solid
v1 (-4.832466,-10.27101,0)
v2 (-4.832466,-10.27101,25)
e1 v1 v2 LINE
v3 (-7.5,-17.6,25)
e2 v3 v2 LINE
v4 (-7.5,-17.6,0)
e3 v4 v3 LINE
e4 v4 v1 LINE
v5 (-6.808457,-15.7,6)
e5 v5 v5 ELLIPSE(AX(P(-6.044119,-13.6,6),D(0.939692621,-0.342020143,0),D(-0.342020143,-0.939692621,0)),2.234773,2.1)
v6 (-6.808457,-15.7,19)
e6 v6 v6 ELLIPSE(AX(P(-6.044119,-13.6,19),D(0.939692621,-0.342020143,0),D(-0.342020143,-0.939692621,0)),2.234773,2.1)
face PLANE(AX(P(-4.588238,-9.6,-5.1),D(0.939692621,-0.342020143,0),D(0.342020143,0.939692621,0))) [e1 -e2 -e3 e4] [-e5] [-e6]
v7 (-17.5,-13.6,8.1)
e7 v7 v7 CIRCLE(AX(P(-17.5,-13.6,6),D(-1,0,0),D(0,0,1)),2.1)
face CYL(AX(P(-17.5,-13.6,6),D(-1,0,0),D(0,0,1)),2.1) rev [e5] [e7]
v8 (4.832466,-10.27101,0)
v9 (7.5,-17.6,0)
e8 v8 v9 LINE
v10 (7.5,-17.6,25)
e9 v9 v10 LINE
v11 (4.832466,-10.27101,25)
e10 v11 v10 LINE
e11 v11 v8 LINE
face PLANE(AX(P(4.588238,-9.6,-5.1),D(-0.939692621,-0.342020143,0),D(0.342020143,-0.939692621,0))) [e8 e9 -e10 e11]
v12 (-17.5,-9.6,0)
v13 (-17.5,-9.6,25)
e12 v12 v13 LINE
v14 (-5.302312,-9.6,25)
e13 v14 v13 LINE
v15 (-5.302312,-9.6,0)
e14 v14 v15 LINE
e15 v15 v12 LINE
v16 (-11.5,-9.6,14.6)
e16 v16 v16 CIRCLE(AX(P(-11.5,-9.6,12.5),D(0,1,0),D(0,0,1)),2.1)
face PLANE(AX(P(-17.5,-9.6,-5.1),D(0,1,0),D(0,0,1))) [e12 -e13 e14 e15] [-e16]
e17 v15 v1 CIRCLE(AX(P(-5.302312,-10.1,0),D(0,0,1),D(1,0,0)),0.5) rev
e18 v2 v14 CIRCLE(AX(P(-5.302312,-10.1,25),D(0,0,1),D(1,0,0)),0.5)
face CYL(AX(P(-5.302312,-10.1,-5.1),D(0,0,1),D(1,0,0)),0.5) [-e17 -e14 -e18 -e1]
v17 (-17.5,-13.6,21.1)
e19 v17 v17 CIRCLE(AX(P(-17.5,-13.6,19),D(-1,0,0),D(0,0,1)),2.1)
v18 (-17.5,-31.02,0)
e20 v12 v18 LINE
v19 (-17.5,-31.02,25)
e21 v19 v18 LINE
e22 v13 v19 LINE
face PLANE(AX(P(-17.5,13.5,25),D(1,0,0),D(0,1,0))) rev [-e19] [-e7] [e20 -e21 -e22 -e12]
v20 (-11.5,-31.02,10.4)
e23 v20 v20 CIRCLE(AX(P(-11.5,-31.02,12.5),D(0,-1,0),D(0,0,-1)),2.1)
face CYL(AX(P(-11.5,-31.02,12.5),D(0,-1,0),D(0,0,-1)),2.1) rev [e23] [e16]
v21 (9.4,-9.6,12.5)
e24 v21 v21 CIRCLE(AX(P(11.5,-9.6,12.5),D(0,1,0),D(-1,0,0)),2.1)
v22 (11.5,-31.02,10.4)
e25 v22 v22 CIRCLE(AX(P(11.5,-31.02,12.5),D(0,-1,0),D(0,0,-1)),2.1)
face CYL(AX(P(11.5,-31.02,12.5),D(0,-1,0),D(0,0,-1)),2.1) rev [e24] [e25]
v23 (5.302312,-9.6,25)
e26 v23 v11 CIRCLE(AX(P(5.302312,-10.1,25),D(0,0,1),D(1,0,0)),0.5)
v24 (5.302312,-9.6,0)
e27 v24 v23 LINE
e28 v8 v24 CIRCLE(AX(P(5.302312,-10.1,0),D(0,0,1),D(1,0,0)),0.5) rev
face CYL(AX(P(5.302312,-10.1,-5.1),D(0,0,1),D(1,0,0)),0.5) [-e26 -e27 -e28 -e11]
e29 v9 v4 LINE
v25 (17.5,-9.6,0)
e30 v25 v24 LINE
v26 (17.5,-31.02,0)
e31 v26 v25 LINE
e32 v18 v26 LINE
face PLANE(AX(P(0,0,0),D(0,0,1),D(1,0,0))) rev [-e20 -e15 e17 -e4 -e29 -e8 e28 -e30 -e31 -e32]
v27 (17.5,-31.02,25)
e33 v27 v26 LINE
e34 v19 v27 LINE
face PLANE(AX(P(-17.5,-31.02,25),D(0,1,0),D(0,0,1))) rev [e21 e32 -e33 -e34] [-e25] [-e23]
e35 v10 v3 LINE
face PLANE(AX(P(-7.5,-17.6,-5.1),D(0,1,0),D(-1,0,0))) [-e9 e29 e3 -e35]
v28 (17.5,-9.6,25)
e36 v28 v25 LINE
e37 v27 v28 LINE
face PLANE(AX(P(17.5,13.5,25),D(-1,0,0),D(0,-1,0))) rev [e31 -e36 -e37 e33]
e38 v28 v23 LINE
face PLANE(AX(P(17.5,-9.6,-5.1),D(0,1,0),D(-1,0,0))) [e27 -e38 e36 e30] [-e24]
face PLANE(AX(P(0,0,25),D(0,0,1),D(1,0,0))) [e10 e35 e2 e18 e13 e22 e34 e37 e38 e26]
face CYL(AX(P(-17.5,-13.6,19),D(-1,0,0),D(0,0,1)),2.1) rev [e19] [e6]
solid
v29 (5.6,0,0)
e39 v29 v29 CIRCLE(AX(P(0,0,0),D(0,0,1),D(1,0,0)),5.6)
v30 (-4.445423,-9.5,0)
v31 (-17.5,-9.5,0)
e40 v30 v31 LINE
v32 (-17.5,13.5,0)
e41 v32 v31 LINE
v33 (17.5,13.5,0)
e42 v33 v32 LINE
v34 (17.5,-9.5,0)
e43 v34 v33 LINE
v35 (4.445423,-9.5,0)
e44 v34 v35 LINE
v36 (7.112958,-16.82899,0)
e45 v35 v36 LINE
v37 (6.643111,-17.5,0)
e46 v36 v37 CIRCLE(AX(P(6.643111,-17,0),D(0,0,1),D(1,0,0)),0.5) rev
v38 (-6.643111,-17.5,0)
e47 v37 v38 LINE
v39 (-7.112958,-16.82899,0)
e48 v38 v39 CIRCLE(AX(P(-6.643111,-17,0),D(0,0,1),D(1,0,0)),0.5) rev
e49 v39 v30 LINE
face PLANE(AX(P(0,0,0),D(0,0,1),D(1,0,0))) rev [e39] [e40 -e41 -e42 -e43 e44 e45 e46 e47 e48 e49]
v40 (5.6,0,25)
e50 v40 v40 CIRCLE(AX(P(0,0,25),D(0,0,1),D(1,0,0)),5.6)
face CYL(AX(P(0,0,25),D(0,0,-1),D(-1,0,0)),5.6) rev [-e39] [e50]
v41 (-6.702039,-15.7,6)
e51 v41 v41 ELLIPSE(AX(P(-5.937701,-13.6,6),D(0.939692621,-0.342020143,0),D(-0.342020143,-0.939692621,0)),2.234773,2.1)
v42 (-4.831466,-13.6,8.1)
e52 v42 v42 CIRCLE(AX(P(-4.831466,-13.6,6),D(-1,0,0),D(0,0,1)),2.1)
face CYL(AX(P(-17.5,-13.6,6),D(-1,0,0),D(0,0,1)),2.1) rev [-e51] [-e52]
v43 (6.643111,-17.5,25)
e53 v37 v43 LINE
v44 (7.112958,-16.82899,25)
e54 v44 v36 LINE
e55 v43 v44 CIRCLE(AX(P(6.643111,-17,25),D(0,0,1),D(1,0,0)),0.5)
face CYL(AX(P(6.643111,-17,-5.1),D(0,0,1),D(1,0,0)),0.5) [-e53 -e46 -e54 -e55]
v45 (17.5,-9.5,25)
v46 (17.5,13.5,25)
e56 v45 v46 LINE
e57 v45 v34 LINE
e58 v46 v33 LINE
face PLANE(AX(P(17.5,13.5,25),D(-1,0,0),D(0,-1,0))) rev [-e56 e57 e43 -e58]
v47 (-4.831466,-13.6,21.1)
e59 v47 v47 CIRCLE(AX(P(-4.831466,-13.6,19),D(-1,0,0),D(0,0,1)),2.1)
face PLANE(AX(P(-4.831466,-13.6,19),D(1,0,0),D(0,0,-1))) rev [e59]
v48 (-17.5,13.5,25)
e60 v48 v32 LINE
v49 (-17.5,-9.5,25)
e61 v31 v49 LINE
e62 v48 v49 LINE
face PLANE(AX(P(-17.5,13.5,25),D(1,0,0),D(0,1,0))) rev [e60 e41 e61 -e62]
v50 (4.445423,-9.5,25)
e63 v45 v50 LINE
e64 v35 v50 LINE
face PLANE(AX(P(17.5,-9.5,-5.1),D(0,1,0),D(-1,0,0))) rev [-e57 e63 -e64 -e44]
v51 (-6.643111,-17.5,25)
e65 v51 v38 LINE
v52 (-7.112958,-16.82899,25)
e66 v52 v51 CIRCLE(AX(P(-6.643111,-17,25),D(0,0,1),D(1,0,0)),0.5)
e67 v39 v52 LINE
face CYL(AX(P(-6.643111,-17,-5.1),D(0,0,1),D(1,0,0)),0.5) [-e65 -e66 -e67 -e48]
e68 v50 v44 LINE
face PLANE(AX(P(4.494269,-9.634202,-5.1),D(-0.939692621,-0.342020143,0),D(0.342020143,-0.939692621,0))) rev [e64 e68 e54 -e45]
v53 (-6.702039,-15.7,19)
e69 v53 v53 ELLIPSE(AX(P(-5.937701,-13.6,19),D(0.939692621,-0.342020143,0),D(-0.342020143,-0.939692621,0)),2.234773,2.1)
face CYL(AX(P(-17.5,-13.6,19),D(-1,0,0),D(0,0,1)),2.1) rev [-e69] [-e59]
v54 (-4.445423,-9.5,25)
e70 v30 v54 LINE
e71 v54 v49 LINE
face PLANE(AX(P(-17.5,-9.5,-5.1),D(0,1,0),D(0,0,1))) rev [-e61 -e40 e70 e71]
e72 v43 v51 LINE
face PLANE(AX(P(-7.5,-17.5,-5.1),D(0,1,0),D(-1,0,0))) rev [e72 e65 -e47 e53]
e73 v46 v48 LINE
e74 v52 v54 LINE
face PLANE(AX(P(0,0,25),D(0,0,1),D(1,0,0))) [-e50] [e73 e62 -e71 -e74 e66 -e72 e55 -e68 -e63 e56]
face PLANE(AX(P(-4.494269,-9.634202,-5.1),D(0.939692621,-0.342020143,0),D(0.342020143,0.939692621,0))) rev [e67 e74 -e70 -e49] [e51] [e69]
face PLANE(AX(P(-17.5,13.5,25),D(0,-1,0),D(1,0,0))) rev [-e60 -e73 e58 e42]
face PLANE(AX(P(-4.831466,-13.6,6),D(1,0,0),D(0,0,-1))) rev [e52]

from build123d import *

# Parameters (mm, degrees)
SKETCH1_W                      = 35
SKETCH1_H                      = 44.52
SKETCH1_R                      = 5.6
BOSS_EXTRUDE1_DEPTH            = 25
CUT_EXTRUDE_THIN3_DEPTH        = 30.1
FILLET1_R                      = 0.5
FILLET2_R                      = 0.5
FILLET3_R                      = 0.5
FILLET4_R                      = 0.5
SKETCH6_W                      = 2.1
SKETCH6_H                      = 44.52
M5X0_8_TAPPED_HOLE1_AT_2_COUNT = 2
M5X0_8_TAPPED_HOLE1_AT_2_PITCH = 23
M5X0_8_START                   = -17.5
M5X0_8_TAPPED_HOLE2_OUTLINE_R  = 2.1
M5X0_8_TAPPED_HOLE2_DEPTH      = 12.668534181


# Read off the part's stored shape, not the designer's step: M5x0.8 Tapped Hole2
with BuildPart() as part:
    # Sketch1 → Boss-Extrude1 (new body)
    with BuildSketch(Plane.XY):
        with Locations((0, -8.76)):
            Rectangle(SKETCH1_W, SKETCH1_H)
        Circle(SKETCH1_R, mode=Mode.SUBTRACT)
    extrude(amount=BOSS_EXTRUDE1_DEPTH)

    # Sketch7 → Cut-Extrude-Thin3 (cut)
    with BuildSketch(Plane.XY.offset(25)):
        Polygon((-17.5, -9.6), (-4.588238126, -9.6), (-7.5, -17.6), (7.5, -17.6), (4.588238126, -9.6), (17.5, -9.6), (17.5, -9.5), (4.445423325, -9.5), (7.357185199, -17.5), (-7.357185199, -17.5), (-4.445423325, -9.5), (-17.5, -9.5), align=None)
    extrude(amount=-CUT_EXTRUDE_THIN3_DEPTH, mode=Mode.SUBTRACT)


with BuildPart() as cut_extrude_thin3_piece_1:
    # of the separate pieces the step leaves, piece 1, a body of its own (cut_extrude_thin3_pieces)
    add(part.part.solids().sort_by_distance((-17.5, 13.5, 0))[0])

    # Fillet1
    fillet1_edges = [cut_extrude_thin3_piece_1.edges().sort_by_distance(p)[0] for p in [
        (-7.357185199, -17.5, 12.5),
    ]]
    fillet(fillet1_edges, radius=FILLET1_R)

    # Fillet2
    fillet2_edges = [cut_extrude_thin3_piece_1.edges().sort_by_distance(p)[0] for p in [
        (7.357185199, -17.5, 12.5),
    ]]
    fillet(fillet2_edges, radius=FILLET2_R)


with BuildPart() as cut_extrude_thin3_piece_2:
    # of the separate pieces the step leaves, piece 2, a body of its own (cut_extrude_thin3_pieces)
    add(part.part.solids().sort_by_distance((-17.5, -31.02, 0))[0])

    # Fillet3
    fillet3_edges = [cut_extrude_thin3_piece_2.edges().sort_by_distance(p)[0] for p in [
        (4.588238126, -9.6, 12.5),
    ]]
    fillet(fillet3_edges, radius=FILLET3_R)

    # Fillet4
    fillet4_edges = [cut_extrude_thin3_piece_2.edges().sort_by_distance(p)[0] for p in [
        (-4.588238126, -9.6, 12.5),
    ]]
    fillet(fillet4_edges, radius=FILLET4_R)

    # Sketch6 → M5x0.8 Tapped Hole1 (revolve, cut)
    with BuildSketch(Plane(origin=(11.5, -31.02, 12.5), x_dir=(0, 0, -1), z_dir=(1, 0, 0))):
        with Locations((1.05, 22.26)):
            Rectangle(SKETCH6_W, SKETCH6_H)
    m5x0_8_tapped_hole1 = revolve(axis=Axis((11.5, -37.37, 12.5), (0, 1, 0)), mode=Mode.SUBTRACT)

    # M5x0.8 Tapped Hole1 at 2: M5x0.8 Tapped Hole1 ×2
    with Locations(*[(-i * M5X0_8_TAPPED_HOLE1_AT_2_PITCH, 0, 0) for i in range(1, M5X0_8_TAPPED_HOLE1_AT_2_COUNT)]):
        add(m5x0_8_tapped_hole1, mode=Mode.SUBTRACT)


with BuildPart() as m5x0_8_tapped_hole2_tool:
    # M5x0.8 Tapped Hole2 outline → M5x0.8 Tapped Hole2 (new body)
    with BuildSketch(Plane.YZ.offset(M5X0_8_START)):
        with Locations((-13.6, 6)):
            Circle(M5X0_8_TAPPED_HOLE2_OUTLINE_R)
        with Locations((-13.6, 19)):
            Circle(M5X0_8_TAPPED_HOLE2_OUTLINE_R)
    extrude(amount=M5X0_8_TAPPED_HOLE2_DEPTH)


with BuildPart() as cut_extrude_thin3_piece_1_1:
    add(cut_extrude_thin3_piece_1.part)

    # M5x0.8 Tapped Hole2: cut by m5x0_8_tapped_hole2_tool
    add(m5x0_8_tapped_hole2_tool.part, mode=Mode.SUBTRACT)


with BuildPart() as cut_extrude_thin3_piece_2_1:
    add(cut_extrude_thin3_piece_2.part)

    # M5x0.8 Tapped Hole2: cut by m5x0_8_tapped_hole2_tool
    add(m5x0_8_tapped_hole2_tool.part, mode=Mode.SUBTRACT)


solid = Compound([cut_extrude_thin3_piece_1_1.part, cut_extrude_thin3_piece_2_1.part])
